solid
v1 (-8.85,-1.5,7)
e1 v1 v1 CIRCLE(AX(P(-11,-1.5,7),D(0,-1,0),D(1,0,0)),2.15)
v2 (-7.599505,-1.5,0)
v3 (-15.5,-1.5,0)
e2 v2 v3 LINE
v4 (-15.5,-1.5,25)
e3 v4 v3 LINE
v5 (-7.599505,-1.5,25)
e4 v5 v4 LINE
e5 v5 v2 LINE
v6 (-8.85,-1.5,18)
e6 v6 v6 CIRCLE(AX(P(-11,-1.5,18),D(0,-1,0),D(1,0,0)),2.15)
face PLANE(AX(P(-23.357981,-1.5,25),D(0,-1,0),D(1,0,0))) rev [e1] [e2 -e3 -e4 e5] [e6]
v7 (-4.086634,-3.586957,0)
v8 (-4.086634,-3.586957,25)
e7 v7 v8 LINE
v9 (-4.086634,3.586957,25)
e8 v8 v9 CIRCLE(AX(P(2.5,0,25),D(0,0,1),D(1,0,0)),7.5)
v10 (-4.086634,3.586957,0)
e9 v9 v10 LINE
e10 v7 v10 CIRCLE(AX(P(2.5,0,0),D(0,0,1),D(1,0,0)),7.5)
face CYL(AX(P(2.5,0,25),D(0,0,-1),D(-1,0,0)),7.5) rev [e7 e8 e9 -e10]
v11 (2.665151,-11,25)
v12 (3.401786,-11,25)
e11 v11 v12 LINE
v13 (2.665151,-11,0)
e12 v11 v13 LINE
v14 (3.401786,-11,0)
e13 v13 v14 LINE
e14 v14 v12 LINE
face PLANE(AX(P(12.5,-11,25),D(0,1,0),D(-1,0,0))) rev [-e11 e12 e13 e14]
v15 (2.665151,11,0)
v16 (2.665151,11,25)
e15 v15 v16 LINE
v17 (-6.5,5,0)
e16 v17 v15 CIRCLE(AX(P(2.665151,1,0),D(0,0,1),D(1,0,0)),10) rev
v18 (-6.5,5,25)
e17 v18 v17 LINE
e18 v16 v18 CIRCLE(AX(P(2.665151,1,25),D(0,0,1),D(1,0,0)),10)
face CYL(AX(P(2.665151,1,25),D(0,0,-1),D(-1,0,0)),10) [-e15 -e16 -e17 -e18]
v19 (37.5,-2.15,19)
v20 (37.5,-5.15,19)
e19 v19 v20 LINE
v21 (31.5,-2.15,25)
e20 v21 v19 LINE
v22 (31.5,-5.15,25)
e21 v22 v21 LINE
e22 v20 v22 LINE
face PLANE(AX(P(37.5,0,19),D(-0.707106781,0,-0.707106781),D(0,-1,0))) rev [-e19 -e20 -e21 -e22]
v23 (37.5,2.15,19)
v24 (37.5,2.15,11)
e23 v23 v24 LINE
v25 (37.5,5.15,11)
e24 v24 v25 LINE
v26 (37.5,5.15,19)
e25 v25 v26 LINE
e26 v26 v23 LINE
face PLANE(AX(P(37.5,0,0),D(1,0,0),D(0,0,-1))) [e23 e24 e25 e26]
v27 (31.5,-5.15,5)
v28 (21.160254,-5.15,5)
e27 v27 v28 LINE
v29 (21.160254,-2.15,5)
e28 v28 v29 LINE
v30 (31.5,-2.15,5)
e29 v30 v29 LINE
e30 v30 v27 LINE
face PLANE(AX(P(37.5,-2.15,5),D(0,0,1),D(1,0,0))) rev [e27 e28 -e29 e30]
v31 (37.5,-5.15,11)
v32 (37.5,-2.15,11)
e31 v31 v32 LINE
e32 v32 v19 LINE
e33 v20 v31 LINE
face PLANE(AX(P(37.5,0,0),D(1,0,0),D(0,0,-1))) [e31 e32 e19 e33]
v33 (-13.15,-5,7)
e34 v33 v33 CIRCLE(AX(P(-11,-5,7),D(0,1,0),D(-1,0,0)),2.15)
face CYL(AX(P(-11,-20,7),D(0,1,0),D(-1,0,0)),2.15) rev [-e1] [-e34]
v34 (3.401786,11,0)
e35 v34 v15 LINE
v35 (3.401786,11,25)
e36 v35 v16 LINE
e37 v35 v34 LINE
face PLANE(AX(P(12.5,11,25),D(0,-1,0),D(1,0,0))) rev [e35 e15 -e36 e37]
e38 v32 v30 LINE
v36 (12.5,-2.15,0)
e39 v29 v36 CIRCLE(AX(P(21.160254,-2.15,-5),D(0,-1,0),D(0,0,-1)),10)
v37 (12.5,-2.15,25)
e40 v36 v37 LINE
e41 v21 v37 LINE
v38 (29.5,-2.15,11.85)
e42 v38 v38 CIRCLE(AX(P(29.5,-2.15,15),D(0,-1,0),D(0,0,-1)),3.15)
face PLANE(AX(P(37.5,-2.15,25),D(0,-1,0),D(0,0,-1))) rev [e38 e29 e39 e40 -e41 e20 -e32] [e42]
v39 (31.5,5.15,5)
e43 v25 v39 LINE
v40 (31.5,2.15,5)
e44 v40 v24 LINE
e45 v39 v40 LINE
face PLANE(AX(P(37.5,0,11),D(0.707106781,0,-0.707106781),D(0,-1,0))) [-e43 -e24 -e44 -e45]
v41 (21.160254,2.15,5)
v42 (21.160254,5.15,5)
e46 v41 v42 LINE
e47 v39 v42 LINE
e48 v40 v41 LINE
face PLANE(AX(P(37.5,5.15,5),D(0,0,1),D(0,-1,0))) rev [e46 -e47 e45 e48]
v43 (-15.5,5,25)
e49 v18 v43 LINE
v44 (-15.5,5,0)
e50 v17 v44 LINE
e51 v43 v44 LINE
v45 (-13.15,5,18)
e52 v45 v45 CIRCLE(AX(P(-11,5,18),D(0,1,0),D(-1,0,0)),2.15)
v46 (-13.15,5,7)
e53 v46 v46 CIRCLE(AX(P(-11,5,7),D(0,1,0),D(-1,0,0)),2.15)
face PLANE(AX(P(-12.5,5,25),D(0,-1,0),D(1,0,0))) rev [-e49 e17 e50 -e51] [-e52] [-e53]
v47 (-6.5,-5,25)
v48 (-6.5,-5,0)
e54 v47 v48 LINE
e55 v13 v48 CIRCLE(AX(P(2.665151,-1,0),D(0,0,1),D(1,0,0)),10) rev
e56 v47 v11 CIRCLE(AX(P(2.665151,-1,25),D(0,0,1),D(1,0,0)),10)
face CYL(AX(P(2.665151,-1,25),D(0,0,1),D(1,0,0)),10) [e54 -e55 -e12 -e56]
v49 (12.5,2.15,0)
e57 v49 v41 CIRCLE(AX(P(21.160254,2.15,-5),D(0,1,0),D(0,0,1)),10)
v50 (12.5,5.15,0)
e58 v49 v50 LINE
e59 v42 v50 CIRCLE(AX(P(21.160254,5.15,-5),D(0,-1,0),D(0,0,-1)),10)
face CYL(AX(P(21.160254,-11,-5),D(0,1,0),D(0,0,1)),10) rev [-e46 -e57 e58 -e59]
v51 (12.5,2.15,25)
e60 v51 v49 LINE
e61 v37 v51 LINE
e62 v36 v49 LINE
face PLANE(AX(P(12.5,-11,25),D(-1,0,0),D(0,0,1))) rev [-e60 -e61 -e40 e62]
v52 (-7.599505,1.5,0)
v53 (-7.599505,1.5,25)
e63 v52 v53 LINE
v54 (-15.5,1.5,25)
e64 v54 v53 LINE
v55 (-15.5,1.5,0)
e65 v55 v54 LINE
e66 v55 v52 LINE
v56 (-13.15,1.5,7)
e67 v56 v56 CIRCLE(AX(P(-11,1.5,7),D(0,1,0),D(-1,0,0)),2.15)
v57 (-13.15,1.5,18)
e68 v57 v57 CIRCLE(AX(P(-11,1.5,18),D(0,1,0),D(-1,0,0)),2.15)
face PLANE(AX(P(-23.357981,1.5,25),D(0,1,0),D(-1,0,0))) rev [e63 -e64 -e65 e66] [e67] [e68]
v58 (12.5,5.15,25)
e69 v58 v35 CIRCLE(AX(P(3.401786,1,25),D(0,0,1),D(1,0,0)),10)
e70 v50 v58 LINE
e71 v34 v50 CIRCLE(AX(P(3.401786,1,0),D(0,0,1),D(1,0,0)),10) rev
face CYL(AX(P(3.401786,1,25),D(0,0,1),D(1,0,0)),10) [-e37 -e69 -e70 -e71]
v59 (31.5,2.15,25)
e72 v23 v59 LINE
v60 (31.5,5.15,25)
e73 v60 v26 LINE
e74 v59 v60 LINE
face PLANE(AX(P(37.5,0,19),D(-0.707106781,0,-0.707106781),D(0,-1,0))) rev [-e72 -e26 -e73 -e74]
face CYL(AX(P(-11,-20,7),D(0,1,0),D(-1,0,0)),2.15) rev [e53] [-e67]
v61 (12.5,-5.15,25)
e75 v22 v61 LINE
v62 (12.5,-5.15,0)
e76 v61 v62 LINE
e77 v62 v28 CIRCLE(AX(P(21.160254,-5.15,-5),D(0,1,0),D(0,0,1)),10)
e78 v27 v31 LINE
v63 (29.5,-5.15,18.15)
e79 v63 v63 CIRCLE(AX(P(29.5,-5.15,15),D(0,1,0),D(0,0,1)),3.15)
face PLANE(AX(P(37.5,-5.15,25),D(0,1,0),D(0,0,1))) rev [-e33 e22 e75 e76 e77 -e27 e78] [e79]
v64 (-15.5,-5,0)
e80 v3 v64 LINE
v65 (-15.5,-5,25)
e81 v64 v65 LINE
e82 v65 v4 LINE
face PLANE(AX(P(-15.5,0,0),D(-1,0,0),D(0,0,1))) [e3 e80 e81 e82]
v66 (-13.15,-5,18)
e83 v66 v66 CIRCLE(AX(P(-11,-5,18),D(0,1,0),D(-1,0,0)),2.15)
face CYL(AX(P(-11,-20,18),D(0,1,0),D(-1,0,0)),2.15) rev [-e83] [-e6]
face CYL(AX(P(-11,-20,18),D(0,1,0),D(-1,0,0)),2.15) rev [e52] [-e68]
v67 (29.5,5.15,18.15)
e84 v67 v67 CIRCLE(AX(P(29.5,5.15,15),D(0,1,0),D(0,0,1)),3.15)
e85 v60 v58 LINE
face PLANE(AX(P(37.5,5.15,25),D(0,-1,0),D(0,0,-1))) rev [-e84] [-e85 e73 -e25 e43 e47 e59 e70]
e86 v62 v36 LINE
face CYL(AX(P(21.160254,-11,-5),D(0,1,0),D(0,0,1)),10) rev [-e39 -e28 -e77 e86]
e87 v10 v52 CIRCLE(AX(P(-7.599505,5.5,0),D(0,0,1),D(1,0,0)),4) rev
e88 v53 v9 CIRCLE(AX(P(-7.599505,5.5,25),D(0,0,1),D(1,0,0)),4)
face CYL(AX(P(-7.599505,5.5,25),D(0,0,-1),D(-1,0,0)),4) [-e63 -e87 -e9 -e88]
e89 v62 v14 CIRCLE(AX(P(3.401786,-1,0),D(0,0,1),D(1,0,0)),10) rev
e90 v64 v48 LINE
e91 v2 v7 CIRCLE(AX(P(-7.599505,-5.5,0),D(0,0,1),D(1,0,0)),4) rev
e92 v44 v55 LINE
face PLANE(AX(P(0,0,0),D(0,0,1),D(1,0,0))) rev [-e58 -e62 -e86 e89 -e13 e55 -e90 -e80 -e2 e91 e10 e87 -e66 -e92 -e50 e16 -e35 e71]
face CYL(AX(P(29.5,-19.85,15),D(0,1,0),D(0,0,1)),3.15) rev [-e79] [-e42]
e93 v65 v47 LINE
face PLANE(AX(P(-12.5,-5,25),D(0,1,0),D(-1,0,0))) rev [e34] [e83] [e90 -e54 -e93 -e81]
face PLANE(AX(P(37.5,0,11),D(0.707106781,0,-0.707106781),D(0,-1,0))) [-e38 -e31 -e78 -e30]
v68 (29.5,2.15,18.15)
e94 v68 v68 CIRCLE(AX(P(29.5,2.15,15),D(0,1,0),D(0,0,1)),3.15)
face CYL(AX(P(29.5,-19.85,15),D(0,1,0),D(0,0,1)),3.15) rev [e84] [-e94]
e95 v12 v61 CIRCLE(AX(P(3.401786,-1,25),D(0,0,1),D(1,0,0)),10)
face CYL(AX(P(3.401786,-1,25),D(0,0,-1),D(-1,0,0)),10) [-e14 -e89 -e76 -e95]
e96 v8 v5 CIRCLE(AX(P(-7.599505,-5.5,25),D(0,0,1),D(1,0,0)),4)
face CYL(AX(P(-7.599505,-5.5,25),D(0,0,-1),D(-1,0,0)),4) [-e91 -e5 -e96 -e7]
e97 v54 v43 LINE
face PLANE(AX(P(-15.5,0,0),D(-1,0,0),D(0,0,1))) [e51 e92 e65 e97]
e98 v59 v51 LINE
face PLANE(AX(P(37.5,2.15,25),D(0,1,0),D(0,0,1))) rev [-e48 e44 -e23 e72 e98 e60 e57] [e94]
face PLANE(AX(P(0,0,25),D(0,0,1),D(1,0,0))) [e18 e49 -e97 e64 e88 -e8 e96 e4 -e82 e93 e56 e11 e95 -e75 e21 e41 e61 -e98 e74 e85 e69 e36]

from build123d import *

# Parameters (mm, degrees)
SKETCH_1_W          = 25
SKETCH_1_H          = 22
SKETCH_1_R          = 7.5
EXTRUDE_1_DEPTH     = 25
SKETCH_2_W          = 20
SKETCH_2_H          = 3
EXTRUDE_2_DEPTH     = 25
SKETCH_3_R          = 3.15
CUT_EXTRUDE_1_DEPTH = 25
FILLET_2_R          = 10
SKETCH_4_W          = 6
SKETCH_4_H          = 6
CUT_EXTRUDE_2_DEPTH = 25
FILLET_3_R          = 10
FILLET_4_R          = 10
SKETCH_5_W          = 21.715962642
SKETCH_5_H          = 3
CUT_EXTRUDE_3_DEPTH = 25
FILLET_5_R          = 4
SKETCH_8_W          = 25
SKETCH_8_H          = 3.5
EXTRUDE_3_DEPTH     = 3
SKETCH_6_R          = 2.15
CUT_EXTRUDE_4_DEPTH = 25
CHAMFER_1_SIZE      = 6


with BuildPart() as part:
    # 草图1 → 凸台-拉伸1 (new body)
    with BuildSketch(Plane.XY):
        Rectangle(SKETCH_1_W, SKETCH_1_H)
        with Locations((2.5, 0)):
            Circle(SKETCH_1_R, mode=Mode.SUBTRACT)
    extrude(amount=EXTRUDE_1_DEPTH)

    # 草图2 → 凸台-拉伸2 (add)
    with BuildSketch(Plane(origin=(12.5, 0, 0), x_dir=(0, 0, -1), z_dir=(1, 0, 0))):
        with Locations((-15, 3.65)):
            Rectangle(SKETCH_2_W, SKETCH_2_H)
        with Locations((-15, -3.65)):
            Rectangle(SKETCH_2_W, SKETCH_2_H)
    extrude(amount=EXTRUDE_2_DEPTH)

    # 草图3 → 切除-拉伸1 (cut)
    with BuildSketch(Plane(origin=(0, 5.15, 0), x_dir=(1, 0, 0), z_dir=(0, 1, 0))):
        with Locations(Location((29.5, -15, 0), (0, 0, 270))):
            Circle(SKETCH_3_R)
    extrude(amount=-CUT_EXTRUDE_1_DEPTH, mode=Mode.SUBTRACT)

    # 圆角2
    # the kernel refuses this fillet: 10 mm, written as the material it adds along each edge
    with BuildSketch(Plane(origin=(12.5, 5.15, 5), x_dir=(0, 0, -1), z_dir=(0, -1, 0)), Plane(origin=(12.5, -2.15, 5), x_dir=(0, 0, -1), z_dir=(0, -1, 0))) as fillet_2_piece_1:
        with BuildLine():
            CenterArc((10, 8.660254038), FILLET_2_R, 180, 60)
            Line((0, 8.660254038), (-0.2, 8.660254038))
            Line((-0.2, 8.660254038), (-0.2, 0))
            Line((-0.2, 0), (0, -0.2))
            ThreePointArc((0, -0.2), (2.5, -0.2), (4.9, -0.173205081))
            Line((4.9, -0.173205081), (5, 0))
        make_face()
    extrude(amount=3)
    with BuildSketch(Plane(origin=(12.5, 5.15, 5), x_dir=(0, 0, -1), z_dir=(0, -1, 0))) as fillet_2_piece_2_section:
        with BuildLine():
            CenterArc((10, 8.660254038), FILLET_2_R, 180, 60)
            Line((0, 8.660254038), (-0.2, 8.660254038))
            Line((-0.2, 8.660254038), (-0.2, 0))
            Line((-0.2, 0), (0, -0.2))
            ThreePointArc((0, -0.2), (2.5, -0.2), (4.9, -0.173205081))
            Line((4.9, -0.173205081), (5, 0))
        make_face()
    fillet_2_piece_2 = extrude(amount=24.650635095, mode=Mode.PRIVATE)
    fillet_2_piece_2 = split(fillet_2_piece_2, bisect_by=Plane(origin=(14.663104458, -5.15, 3.704832889), z_dir=(0, 1, 0)), keep=Keep.TOP, mode=Mode.PRIVATE)
    fillet_2_piece_2 = split(fillet_2_piece_2, bisect_by=Plane(origin=(14.663104458, -2.15, 3.704832889), z_dir=(0, -1, 0)), keep=Keep.TOP, mode=Mode.PRIVATE)
    add(fillet_2_piece_2)
    with BuildSketch(Plane(origin=(12.5, 19.500635095, 5), x_dir=(0, 0, -1), z_dir=(0, -1, 0))) as fillet_2_piece_3_section:
        with BuildLine():
            CenterArc((10, 8.660254038), FILLET_2_R, 180, 60)
            Line((0, 8.660254038), (-0.2, 8.660254038))
            Line((-0.2, 8.660254038), (-0.2, 0))
            Line((-0.2, 0), (0, -0.2))
            ThreePointArc((0, -0.2), (2.5, -0.2), (4.9, -0.173205081))
            Line((4.9, -0.173205081), (5, 0))
        make_face()
    fillet_2_piece_3 = extrude(amount=24.650635095, mode=Mode.PRIVATE)
    fillet_2_piece_3 = split(fillet_2_piece_3, bisect_by=Plane(origin=(14.663104458, 2.15, 3.704832889), z_dir=(0, 1, 0)), keep=Keep.TOP, mode=Mode.PRIVATE)
    fillet_2_piece_3 = split(fillet_2_piece_3, bisect_by=Plane(origin=(14.663104458, 5.15, 3.704832889), z_dir=(0, -1, 0)), keep=Keep.TOP, mode=Mode.PRIVATE)
    add(fillet_2_piece_3)

    # 草图4 → 切除-拉伸2 (cut)
    with BuildSketch(Plane(origin=(0, 0, 0), x_dir=(-1, 0, 0), z_dir=(0, 0, -1))):
        with Locations((9.5, 8)):
            Rectangle(SKETCH_4_W, SKETCH_4_H)
        with Locations((9.5, -8)):
            Rectangle(SKETCH_4_W, SKETCH_4_H)
    extrude(amount=-CUT_EXTRUDE_2_DEPTH, mode=Mode.SUBTRACT)

    # 圆角3
    # the kernel refuses this fillet: 10 mm, written as the material it takes off along each edge
    with BuildSketch(Plane(origin=(-6.5, -11, -22.912878475), x_dir=(0, 1, 0), z_dir=(0, 0, 1))) as fillet_3_piece_1:
        with BuildLine():
            CenterArc((10, -9.16515139), FILLET_3_R, 113.578178478, 66.421821522)
            Line((0, -9.16515139), (-0.2, -9.16515139))
            Line((-0.2, -9.16515139), (-0.2, 0))
            Line((-0.2, 0), (0, 0.2))
            ThreePointArc((0, 0.2), (3, 0.2), (5.92, 0.183303028))
            Line((5.92, 0.183303028), (6, 0))
        make_face()
    extrude(amount=70.82575695, mode=Mode.SUBTRACT)
    with BuildSketch(Plane(origin=(-6.5, 11, -22.912878475), x_dir=(1, 0, 0), z_dir=(0, 0, 1))) as fillet_3_piece_2:
        with BuildLine():
            CenterArc((9.16515139, -10), FILLET_3_R, 90, 66.421821522)
            Line((0, -6), (-0.183303028, -5.92))
            ThreePointArc((-0.183303028, -5.92), (-0.2, -3), (-0.2, 0))
            Line((-0.2, 0), (0, 0.2))
            Line((0, 0.2), (9.16515139, 0.2))
            Line((9.16515139, 0.2), (9.16515139, 0))
        make_face()
    extrude(amount=70.82575695, mode=Mode.SUBTRACT)

    # 圆角4
    # the kernel refuses this fillet: 10 mm, written as the material it takes off along each edge
    with BuildSketch(Plane(origin=(12.5, 11, -22.745535276), x_dir=(0, -1, 0), z_dir=(0, 0, 1))) as fillet_4_piece_1:
        with BuildLine():
            CenterArc((10, -9.09821411), FILLET_4_R, 114.519316483, 65.480683517)
            Line((0, -9.09821411), (-0.2, -9.09821411))
            Line((-0.2, -9.09821411), (-0.2, 0))
            Line((-0.2, 0), (0, 0.2))
            ThreePointArc((0, 0.2), (2.925, 0.2), (5.767, 0.181964282))
            Line((5.767, 0.181964282), (5.85, 0))
        make_face()
    extrude(amount=70.491070552, mode=Mode.SUBTRACT)
    with BuildSketch(Plane(origin=(12.5, -11, -22.745535276), x_dir=(-1, 0, 0), z_dir=(0, 0, 1))) as fillet_4_piece_2:
        with BuildLine():
            CenterArc((9.09821411, -10), FILLET_4_R, 90, 65.480683517)
            Line((0, -5.85), (-0.181964282, -5.767))
            ThreePointArc((-0.181964282, -5.767), (-0.2, -2.925), (-0.2, 0))
            Line((-0.2, 0), (0, 0.2))
            Line((0, 0.2), (9.09821411, 0.2))
            Line((9.09821411, 0.2), (9.09821411, 0))
        make_face()
    extrude(amount=70.491070552, mode=Mode.SUBTRACT)

    # 草图5 → 切除-拉伸3 (cut)
    with BuildSketch(Plane(origin=(0, 0, 0), x_dir=(-1, 0, 0), z_dir=(0, 0, -1))):
        with Locations((12.5, 0)):
            Rectangle(SKETCH_5_W, SKETCH_5_H)
    extrude(amount=-CUT_EXTRUDE_3_DEPTH, mode=Mode.SUBTRACT)

    # 圆角5
    fillet_5_edges = [part.edges().sort_by_distance(p)[0] for p in [
        (-4.848469228, -1.5, 12.5),
        (-4.848469228, 1.5, 12.5),
    ]]
    fillet(fillet_5_edges, radius=FILLET_5_R)

    # 草图8 → 凸台-拉伸3 (add)
    with BuildSketch(Plane.ZY.offset(12.5)):
        with Locations((12.5, 3.25)):
            Rectangle(SKETCH_8_W, SKETCH_8_H)
        with Locations((12.5, -3.25)):
            Rectangle(SKETCH_8_W, SKETCH_8_H)
    extrude(amount=EXTRUDE_3_DEPTH)

    # 草图6 → 切除-拉伸4 (cut)
    with BuildSketch(Plane(origin=(0, 5, 0), x_dir=(1, 0, 0), z_dir=(0, 1, 0))):
        with Locations(Location((-11, -7, 0), (0, 0, 180))):
            Circle(SKETCH_6_R)
        with Locations(Location((-11, -18, 0), (0, 0, 180))):
            Circle(SKETCH_6_R)
    extrude(amount=-CUT_EXTRUDE_4_DEPTH, mode=Mode.SUBTRACT)

    # 倒角1
    chamfer_1_edges = [part.edges().sort_by_distance(p)[0] for p in [
        (37.5, 3.65, 25),
        (37.5, 3.65, 5),
        (37.5, -3.65, 25),
        (37.5, -3.65, 5),
    ]]
    chamfer(chamfer_1_edges, length=CHAMFER_1_SIZE)


solid = part.part
